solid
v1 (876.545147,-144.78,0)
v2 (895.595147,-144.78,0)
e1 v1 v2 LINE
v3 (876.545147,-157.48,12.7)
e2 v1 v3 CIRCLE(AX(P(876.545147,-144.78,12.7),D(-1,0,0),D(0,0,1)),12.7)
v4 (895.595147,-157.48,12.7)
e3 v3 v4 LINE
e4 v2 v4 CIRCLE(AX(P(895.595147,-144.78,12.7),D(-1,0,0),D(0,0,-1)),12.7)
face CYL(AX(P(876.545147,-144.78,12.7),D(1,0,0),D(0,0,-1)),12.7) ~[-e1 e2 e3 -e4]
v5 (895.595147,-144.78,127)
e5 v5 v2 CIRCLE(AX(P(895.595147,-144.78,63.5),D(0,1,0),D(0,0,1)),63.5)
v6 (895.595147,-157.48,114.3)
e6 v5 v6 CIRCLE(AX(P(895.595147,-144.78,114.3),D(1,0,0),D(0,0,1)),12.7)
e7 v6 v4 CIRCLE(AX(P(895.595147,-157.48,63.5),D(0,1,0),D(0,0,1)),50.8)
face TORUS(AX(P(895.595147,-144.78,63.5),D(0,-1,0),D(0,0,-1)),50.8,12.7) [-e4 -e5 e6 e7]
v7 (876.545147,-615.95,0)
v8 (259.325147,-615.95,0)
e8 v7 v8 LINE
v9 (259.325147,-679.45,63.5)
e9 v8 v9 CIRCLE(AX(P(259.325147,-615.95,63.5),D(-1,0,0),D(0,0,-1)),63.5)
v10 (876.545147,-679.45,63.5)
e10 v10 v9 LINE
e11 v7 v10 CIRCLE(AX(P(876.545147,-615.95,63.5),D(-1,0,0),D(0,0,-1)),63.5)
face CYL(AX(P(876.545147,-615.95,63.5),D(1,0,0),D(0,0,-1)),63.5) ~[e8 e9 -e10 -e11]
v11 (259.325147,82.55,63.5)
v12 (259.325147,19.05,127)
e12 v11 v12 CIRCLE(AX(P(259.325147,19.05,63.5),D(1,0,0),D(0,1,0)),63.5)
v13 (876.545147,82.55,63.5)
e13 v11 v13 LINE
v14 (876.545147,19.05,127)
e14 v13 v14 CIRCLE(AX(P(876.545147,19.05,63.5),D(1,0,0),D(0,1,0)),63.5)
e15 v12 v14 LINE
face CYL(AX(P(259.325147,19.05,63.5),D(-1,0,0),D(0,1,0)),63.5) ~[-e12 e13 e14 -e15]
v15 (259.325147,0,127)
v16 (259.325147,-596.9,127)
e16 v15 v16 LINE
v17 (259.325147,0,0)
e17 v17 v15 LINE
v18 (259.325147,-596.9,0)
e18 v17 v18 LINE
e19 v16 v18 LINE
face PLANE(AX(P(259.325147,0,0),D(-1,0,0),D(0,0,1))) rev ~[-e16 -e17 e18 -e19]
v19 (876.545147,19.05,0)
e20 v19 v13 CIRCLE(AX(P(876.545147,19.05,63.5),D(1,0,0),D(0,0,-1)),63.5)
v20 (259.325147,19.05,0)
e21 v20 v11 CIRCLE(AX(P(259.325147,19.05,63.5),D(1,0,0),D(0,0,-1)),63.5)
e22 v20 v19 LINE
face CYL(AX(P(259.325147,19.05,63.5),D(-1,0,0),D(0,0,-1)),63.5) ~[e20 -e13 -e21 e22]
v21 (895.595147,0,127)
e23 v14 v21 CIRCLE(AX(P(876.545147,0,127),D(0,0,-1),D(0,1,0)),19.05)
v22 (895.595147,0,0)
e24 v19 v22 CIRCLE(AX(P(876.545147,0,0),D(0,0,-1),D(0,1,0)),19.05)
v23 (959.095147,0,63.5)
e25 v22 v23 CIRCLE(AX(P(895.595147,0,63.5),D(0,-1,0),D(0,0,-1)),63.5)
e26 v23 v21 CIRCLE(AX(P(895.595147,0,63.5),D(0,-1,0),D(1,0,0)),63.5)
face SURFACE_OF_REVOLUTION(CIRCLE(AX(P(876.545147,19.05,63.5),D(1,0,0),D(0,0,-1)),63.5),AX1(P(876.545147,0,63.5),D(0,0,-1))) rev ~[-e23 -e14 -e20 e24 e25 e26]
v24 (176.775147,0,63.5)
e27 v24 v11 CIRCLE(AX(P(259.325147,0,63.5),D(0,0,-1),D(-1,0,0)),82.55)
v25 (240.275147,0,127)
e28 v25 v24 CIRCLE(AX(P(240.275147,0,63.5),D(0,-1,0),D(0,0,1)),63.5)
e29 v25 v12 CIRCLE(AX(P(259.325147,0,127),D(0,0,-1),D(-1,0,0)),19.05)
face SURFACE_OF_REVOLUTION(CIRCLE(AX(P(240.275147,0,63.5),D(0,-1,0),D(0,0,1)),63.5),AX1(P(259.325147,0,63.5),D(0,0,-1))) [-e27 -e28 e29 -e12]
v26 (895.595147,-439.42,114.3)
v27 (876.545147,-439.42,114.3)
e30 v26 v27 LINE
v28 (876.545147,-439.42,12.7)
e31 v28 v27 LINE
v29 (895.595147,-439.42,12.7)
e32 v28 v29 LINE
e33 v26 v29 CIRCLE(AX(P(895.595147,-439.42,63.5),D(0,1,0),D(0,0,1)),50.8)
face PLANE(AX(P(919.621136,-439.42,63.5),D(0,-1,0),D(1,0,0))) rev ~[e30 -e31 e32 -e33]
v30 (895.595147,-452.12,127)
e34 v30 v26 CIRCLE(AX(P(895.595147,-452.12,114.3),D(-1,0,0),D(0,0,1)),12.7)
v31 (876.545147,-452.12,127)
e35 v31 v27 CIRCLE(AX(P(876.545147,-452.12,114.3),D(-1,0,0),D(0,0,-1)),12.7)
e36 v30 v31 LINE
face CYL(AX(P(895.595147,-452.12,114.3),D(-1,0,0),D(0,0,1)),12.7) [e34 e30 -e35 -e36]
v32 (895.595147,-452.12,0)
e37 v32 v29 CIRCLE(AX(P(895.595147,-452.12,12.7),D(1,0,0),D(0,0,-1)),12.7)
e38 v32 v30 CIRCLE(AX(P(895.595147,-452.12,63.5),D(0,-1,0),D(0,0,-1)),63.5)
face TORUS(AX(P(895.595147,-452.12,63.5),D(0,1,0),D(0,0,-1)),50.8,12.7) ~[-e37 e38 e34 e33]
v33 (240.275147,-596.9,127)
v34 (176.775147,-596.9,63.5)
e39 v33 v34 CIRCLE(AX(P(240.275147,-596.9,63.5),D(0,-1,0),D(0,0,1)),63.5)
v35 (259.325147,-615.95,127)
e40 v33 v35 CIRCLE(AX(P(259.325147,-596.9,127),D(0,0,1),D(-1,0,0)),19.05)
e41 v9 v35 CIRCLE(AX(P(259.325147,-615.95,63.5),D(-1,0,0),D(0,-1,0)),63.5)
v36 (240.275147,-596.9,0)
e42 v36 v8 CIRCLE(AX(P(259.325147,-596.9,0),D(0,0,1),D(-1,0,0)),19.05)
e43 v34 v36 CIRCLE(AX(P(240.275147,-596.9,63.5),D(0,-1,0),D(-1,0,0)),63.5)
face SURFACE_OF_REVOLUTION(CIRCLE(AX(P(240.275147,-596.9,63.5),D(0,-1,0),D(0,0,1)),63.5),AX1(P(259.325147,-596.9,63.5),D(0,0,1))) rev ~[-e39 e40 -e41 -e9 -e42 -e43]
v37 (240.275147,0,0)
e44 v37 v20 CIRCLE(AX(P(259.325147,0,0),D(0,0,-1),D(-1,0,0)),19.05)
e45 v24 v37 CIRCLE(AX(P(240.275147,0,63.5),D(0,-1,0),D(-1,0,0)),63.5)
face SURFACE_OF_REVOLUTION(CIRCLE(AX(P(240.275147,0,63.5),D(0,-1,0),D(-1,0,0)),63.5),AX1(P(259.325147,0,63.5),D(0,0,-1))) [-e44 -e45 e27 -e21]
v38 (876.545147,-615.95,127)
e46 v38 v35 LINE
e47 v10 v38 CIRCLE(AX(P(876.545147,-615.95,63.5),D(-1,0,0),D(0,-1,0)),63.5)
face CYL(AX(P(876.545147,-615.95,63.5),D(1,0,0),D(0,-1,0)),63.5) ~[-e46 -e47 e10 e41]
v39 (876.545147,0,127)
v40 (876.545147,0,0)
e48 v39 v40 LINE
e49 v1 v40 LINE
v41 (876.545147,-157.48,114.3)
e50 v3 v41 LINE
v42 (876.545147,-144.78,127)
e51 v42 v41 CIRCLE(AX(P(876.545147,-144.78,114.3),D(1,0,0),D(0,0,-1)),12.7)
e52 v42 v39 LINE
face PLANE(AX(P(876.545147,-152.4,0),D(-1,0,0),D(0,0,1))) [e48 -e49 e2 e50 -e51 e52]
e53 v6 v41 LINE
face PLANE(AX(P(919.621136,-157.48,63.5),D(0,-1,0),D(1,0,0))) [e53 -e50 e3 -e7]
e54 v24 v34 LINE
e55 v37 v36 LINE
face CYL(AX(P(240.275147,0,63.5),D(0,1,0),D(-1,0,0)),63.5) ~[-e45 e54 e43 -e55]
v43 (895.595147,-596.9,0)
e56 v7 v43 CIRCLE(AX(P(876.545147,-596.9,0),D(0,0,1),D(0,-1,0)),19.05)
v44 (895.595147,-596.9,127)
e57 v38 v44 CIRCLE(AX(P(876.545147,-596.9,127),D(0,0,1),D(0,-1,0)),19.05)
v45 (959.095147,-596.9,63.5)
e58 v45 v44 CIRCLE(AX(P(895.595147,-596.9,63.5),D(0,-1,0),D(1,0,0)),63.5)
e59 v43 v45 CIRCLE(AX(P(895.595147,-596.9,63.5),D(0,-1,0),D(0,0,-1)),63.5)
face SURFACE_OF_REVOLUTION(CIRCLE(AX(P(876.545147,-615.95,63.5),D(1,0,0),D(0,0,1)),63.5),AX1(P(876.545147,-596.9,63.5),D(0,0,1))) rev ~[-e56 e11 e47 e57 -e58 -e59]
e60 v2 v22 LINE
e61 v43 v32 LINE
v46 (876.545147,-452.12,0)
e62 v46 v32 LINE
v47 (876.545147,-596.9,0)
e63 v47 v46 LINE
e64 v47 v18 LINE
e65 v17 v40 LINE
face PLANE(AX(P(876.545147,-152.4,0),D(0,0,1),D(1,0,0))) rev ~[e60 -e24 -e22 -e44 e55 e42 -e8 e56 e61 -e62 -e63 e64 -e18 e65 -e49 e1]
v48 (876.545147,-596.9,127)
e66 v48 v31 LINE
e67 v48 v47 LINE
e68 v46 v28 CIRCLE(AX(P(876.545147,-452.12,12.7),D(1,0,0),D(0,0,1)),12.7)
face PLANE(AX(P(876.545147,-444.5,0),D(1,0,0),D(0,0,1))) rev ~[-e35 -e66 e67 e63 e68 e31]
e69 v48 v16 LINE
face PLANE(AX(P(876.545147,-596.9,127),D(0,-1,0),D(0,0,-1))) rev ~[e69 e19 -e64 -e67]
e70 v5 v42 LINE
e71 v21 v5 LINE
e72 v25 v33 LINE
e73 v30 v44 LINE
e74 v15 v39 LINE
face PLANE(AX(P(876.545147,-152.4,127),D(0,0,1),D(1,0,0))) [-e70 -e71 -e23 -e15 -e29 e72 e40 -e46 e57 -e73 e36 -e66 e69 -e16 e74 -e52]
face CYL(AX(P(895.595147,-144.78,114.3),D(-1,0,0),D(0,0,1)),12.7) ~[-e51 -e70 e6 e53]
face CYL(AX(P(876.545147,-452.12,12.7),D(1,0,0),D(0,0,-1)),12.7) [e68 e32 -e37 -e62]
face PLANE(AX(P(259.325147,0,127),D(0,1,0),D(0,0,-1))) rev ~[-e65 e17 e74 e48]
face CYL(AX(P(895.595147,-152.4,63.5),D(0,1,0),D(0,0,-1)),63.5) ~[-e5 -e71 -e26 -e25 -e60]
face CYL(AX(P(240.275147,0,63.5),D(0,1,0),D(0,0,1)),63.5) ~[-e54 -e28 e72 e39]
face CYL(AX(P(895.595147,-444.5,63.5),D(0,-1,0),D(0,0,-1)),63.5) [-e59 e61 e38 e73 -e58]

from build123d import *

# Parameters (mm, degrees)
F1_DEPTH  = 617.22
F0_W      = 19.05
F0_H      = 127
F2_DEPTH  = 596.9
F3_DEPTH  = 152.4
F6_ANGLE  = 90
F12_ANGLE = -90
F18_ANGLE = 90
F19_ANGLE = 90
F23_ANGLE = 90
F24_ANGLE = 90
F25_DEPTH = 5.08
F26_DEPTH = 5.08
F27_R     = 12.7


with BuildPart() as f1:
    # F0 (on Front) → F1 (new body)
    with BuildSketch(Plane.XZ):
        with BuildLine():
            Line((19.05, 127), (19.05, 63.5))
            Line((19.05, 63.5), (82.55, 63.5))
            ThreePointArc((82.55, 63.5), (63.9512806053, 108.4012806053), (19.05, 127))
        make_face()
        with BuildLine():
            Line((19.05, 63.5), (19.05, 0))
            ThreePointArc((19.05, 0), (63.9512806053, 18.5987193947), (82.55, 63.5))
            Line((82.55, 63.5), (19.05, 63.5))
        make_face()
        Polygon((0, 127), (0, 0), (19.05, 0), (19.05, 63.5), (19.05, 127), align=None)
    extrude(amount=F1_DEPTH)


with BuildPart() as f2:
    # F0 (on Front) → F2 (new body)
    with BuildSketch(Plane.XZ):
        with Locations((249.8001466751, 63.5)):
            Rectangle(F0_W, F0_H)
        with BuildLine():
            ThreePointArc((240.2751466751, 127), (195.3738660698, 108.4012806053), (176.7751466751, 63.5))
            ThreePointArc((176.7751466751, 63.5), (195.3738660698, 18.5987193947), (240.2751466751, 0))
            Line((240.2751466751, 0), (240.2751466751, 127))
        make_face()
    extrude(amount=F2_DEPTH)


with BuildPart() as f3:
    # F0 (on Front) → F3 (new body)
    with BuildSketch(Plane.XZ):
        with BuildLine():
            ThreePointArc((-240.2751466751, 0), (-195.3738660698, 18.5987193947), (-176.7751466751, 63.5))
            ThreePointArc((-176.7751466751, 63.5), (-195.3738660698, 108.4012806053), (-240.2751466751, 127))
            Line((-240.2751466751, 127), (-240.2751466751, 0))
        make_face()
        with Locations((-249.8001466751, 63.5)):
            Rectangle(F0_W, F0_H)
    extrude(amount=F3_DEPTH)


with BuildPart() as f4_1:
    # F4: copy of F3
    add(f3.part.moved(Location((127, 0, 0))))


with BuildPart() as f5_1:
    # F5: copy of F1
    add(f1.part.moved(Location((127, 127, 254))))


with BuildPart() as f5_1_1:
    # F6: moved
    add(f5_1.part.rotate(Axis((127, 127, 317.5), (0, 0, 1)), F6_ANGLE))


with BuildPart() as f5_1_2:
    # F9: moved
    add(f5_1_1.part.moved(Location((0, -127, -254))))


with BuildPart() as f5_1_3:
    # F11: moved
    add(f5_1_2.part.moved(Location((132.3251466751, 0, 0))))


with BuildPart() as f1_1:
    # F12: moved
    add(f1.part.rotate(Axis((0, -617.22, 63.5), (0, 0, 1)), F12_ANGLE))


with BuildPart() as f1_2:
    # F14: moved
    add(f1_1.part.moved(Location((0, 20.32, 0))))


with BuildPart() as f1_3:
    # F16: moved
    add(f1_2.part.moved(Location((259.3251466751, 0, 0))))


    add(f2.part)  # F18 merges F2
    # F2_face1 (on face) → F18 (revolve)
    with BuildSketch(Plane(origin=(223.4065289788, -596.9, 63.5), x_dir=(1, 0, 0), z_dir=(0, -1, 0))):
        with BuildLine():
            Line((35.9186176963, 63.5), (16.8686176963, 63.5))
            ThreePointArc((16.8686176963, 63.5), (-46.6313823037, 0), (16.8686176963, -63.5))
            Line((16.8686176963, -63.5), (35.9186176963, -63.5))
            Line((35.9186176963, -63.5), (35.9186176963, 63.5))
        make_face()
    revolve(axis=Axis((259.3251466751, -596.9, 63.5), (0, 0, 1)), revolution_arc=F18_ANGLE)


    add(f5_1_3.part)  # F19 merges F5_1
    # F0 (on Front) → F19 (revolve)
    with BuildSketch(Plane.XZ):
        with Locations((249.8001466751, 63.5)):
            Rectangle(F0_W, F0_H)
        with BuildLine():
            ThreePointArc((240.2751466751, 127), (195.3738660698, 108.4012806053), (176.7751466751, 63.5))
            ThreePointArc((176.7751466751, 63.5), (195.3738660698, 18.5987193947), (240.2751466751, 0))
            Line((240.2751466751, 0), (240.2751466751, 127))
        make_face()
    revolve(axis=Axis((259.3251466751, 0, 63.5), (0, 0, -1)), revolution_arc=F19_ANGLE)



with BuildPart() as f4_1_1:
    # F21: moved
    add(f4_1.part.moved(Location((1008.8702933502, -444.5, 0))))


with BuildPart() as f3_1:
    # F22: moved
    add(f3.part.moved(Location((1135.8702933502, 0, 0))))


with BuildPart() as f1_4:
    add(f1_3.part)

    add(f3_1.part)  # F23 merges F3
    # F5_face1 (on face) → F23 (revolve)
    with BuildSketch(Plane(origin=(876.5451466751, 35.9186176963, 63.5), x_dir=(0, 1, 0), z_dir=(1, 0, 0))):
        with BuildLine():
            ThreePointArc((-16.8686176963, -63.5), (46.6313823037, 0), (-16.8686176963, 63.5))
            Line((-16.8686176963, 63.5), (-35.9186176963, 63.5))
            Line((-35.9186176963, 63.5), (-35.9186176963, -63.5))
            Line((-35.9186176963, -63.5), (-16.8686176963, -63.5))
        make_face()
    revolve(axis=Axis((876.5451466751, 0, 63.5), (0, 0, -1)), revolution_arc=F23_ANGLE)


    add(f4_1_1.part)  # F24 merges F4_1
    # F1_face2 (on face) → F24 (revolve)
    with BuildSketch(Plane(origin=(876.5451466751, -632.8186176963, 63.5), x_dir=(0, 1, 0), z_dir=(1, 0, 0))):
        with BuildLine():
            ThreePointArc((16.8686176963, 63.5), (-46.6313823037, 0), (16.8686176963, -63.5))
            Line((16.8686176963, -63.5), (35.9186176963, -63.5))
            Line((35.9186176963, -63.5), (35.9186176963, 63.5))
            Line((35.9186176963, 63.5), (16.8686176963, 63.5))
        make_face()
    revolve(axis=Axis((876.5451466751, -596.9, 63.5), (0, 0, 1)), revolution_arc=F24_ANGLE)

    # F25 (add): a face of the model
    f25_faces = [f1_4.faces().sort_by_distance(p)[0] for p in [
        (912.4637643715, -444.5, 63.5),
    ]]
    extrude(f25_faces, amount=F25_DEPTH)

    # F26 (add): a face of the model
    f26_faces = [f1_4.faces().sort_by_distance(p)[0] for p in [
        (912.4637643715, -152.4, 63.5),
    ]]
    extrude(f26_faces, amount=F26_DEPTH)

    # F27
    f27_edges = [f1_4.edges().sort_by_distance(p)[0] for p in [
        (959.095147, -439.42, 63.5),
        (886.070147, -439.42, 127),
        (886.070147, -439.42, 0),
        (959.095147, -157.48, 63.5),
        (886.070147, -157.48, 127),
        (886.070147, -157.48, 0),
    ]]
    fillet(f27_edges, radius=F27_R)


solid = f1_4.part
